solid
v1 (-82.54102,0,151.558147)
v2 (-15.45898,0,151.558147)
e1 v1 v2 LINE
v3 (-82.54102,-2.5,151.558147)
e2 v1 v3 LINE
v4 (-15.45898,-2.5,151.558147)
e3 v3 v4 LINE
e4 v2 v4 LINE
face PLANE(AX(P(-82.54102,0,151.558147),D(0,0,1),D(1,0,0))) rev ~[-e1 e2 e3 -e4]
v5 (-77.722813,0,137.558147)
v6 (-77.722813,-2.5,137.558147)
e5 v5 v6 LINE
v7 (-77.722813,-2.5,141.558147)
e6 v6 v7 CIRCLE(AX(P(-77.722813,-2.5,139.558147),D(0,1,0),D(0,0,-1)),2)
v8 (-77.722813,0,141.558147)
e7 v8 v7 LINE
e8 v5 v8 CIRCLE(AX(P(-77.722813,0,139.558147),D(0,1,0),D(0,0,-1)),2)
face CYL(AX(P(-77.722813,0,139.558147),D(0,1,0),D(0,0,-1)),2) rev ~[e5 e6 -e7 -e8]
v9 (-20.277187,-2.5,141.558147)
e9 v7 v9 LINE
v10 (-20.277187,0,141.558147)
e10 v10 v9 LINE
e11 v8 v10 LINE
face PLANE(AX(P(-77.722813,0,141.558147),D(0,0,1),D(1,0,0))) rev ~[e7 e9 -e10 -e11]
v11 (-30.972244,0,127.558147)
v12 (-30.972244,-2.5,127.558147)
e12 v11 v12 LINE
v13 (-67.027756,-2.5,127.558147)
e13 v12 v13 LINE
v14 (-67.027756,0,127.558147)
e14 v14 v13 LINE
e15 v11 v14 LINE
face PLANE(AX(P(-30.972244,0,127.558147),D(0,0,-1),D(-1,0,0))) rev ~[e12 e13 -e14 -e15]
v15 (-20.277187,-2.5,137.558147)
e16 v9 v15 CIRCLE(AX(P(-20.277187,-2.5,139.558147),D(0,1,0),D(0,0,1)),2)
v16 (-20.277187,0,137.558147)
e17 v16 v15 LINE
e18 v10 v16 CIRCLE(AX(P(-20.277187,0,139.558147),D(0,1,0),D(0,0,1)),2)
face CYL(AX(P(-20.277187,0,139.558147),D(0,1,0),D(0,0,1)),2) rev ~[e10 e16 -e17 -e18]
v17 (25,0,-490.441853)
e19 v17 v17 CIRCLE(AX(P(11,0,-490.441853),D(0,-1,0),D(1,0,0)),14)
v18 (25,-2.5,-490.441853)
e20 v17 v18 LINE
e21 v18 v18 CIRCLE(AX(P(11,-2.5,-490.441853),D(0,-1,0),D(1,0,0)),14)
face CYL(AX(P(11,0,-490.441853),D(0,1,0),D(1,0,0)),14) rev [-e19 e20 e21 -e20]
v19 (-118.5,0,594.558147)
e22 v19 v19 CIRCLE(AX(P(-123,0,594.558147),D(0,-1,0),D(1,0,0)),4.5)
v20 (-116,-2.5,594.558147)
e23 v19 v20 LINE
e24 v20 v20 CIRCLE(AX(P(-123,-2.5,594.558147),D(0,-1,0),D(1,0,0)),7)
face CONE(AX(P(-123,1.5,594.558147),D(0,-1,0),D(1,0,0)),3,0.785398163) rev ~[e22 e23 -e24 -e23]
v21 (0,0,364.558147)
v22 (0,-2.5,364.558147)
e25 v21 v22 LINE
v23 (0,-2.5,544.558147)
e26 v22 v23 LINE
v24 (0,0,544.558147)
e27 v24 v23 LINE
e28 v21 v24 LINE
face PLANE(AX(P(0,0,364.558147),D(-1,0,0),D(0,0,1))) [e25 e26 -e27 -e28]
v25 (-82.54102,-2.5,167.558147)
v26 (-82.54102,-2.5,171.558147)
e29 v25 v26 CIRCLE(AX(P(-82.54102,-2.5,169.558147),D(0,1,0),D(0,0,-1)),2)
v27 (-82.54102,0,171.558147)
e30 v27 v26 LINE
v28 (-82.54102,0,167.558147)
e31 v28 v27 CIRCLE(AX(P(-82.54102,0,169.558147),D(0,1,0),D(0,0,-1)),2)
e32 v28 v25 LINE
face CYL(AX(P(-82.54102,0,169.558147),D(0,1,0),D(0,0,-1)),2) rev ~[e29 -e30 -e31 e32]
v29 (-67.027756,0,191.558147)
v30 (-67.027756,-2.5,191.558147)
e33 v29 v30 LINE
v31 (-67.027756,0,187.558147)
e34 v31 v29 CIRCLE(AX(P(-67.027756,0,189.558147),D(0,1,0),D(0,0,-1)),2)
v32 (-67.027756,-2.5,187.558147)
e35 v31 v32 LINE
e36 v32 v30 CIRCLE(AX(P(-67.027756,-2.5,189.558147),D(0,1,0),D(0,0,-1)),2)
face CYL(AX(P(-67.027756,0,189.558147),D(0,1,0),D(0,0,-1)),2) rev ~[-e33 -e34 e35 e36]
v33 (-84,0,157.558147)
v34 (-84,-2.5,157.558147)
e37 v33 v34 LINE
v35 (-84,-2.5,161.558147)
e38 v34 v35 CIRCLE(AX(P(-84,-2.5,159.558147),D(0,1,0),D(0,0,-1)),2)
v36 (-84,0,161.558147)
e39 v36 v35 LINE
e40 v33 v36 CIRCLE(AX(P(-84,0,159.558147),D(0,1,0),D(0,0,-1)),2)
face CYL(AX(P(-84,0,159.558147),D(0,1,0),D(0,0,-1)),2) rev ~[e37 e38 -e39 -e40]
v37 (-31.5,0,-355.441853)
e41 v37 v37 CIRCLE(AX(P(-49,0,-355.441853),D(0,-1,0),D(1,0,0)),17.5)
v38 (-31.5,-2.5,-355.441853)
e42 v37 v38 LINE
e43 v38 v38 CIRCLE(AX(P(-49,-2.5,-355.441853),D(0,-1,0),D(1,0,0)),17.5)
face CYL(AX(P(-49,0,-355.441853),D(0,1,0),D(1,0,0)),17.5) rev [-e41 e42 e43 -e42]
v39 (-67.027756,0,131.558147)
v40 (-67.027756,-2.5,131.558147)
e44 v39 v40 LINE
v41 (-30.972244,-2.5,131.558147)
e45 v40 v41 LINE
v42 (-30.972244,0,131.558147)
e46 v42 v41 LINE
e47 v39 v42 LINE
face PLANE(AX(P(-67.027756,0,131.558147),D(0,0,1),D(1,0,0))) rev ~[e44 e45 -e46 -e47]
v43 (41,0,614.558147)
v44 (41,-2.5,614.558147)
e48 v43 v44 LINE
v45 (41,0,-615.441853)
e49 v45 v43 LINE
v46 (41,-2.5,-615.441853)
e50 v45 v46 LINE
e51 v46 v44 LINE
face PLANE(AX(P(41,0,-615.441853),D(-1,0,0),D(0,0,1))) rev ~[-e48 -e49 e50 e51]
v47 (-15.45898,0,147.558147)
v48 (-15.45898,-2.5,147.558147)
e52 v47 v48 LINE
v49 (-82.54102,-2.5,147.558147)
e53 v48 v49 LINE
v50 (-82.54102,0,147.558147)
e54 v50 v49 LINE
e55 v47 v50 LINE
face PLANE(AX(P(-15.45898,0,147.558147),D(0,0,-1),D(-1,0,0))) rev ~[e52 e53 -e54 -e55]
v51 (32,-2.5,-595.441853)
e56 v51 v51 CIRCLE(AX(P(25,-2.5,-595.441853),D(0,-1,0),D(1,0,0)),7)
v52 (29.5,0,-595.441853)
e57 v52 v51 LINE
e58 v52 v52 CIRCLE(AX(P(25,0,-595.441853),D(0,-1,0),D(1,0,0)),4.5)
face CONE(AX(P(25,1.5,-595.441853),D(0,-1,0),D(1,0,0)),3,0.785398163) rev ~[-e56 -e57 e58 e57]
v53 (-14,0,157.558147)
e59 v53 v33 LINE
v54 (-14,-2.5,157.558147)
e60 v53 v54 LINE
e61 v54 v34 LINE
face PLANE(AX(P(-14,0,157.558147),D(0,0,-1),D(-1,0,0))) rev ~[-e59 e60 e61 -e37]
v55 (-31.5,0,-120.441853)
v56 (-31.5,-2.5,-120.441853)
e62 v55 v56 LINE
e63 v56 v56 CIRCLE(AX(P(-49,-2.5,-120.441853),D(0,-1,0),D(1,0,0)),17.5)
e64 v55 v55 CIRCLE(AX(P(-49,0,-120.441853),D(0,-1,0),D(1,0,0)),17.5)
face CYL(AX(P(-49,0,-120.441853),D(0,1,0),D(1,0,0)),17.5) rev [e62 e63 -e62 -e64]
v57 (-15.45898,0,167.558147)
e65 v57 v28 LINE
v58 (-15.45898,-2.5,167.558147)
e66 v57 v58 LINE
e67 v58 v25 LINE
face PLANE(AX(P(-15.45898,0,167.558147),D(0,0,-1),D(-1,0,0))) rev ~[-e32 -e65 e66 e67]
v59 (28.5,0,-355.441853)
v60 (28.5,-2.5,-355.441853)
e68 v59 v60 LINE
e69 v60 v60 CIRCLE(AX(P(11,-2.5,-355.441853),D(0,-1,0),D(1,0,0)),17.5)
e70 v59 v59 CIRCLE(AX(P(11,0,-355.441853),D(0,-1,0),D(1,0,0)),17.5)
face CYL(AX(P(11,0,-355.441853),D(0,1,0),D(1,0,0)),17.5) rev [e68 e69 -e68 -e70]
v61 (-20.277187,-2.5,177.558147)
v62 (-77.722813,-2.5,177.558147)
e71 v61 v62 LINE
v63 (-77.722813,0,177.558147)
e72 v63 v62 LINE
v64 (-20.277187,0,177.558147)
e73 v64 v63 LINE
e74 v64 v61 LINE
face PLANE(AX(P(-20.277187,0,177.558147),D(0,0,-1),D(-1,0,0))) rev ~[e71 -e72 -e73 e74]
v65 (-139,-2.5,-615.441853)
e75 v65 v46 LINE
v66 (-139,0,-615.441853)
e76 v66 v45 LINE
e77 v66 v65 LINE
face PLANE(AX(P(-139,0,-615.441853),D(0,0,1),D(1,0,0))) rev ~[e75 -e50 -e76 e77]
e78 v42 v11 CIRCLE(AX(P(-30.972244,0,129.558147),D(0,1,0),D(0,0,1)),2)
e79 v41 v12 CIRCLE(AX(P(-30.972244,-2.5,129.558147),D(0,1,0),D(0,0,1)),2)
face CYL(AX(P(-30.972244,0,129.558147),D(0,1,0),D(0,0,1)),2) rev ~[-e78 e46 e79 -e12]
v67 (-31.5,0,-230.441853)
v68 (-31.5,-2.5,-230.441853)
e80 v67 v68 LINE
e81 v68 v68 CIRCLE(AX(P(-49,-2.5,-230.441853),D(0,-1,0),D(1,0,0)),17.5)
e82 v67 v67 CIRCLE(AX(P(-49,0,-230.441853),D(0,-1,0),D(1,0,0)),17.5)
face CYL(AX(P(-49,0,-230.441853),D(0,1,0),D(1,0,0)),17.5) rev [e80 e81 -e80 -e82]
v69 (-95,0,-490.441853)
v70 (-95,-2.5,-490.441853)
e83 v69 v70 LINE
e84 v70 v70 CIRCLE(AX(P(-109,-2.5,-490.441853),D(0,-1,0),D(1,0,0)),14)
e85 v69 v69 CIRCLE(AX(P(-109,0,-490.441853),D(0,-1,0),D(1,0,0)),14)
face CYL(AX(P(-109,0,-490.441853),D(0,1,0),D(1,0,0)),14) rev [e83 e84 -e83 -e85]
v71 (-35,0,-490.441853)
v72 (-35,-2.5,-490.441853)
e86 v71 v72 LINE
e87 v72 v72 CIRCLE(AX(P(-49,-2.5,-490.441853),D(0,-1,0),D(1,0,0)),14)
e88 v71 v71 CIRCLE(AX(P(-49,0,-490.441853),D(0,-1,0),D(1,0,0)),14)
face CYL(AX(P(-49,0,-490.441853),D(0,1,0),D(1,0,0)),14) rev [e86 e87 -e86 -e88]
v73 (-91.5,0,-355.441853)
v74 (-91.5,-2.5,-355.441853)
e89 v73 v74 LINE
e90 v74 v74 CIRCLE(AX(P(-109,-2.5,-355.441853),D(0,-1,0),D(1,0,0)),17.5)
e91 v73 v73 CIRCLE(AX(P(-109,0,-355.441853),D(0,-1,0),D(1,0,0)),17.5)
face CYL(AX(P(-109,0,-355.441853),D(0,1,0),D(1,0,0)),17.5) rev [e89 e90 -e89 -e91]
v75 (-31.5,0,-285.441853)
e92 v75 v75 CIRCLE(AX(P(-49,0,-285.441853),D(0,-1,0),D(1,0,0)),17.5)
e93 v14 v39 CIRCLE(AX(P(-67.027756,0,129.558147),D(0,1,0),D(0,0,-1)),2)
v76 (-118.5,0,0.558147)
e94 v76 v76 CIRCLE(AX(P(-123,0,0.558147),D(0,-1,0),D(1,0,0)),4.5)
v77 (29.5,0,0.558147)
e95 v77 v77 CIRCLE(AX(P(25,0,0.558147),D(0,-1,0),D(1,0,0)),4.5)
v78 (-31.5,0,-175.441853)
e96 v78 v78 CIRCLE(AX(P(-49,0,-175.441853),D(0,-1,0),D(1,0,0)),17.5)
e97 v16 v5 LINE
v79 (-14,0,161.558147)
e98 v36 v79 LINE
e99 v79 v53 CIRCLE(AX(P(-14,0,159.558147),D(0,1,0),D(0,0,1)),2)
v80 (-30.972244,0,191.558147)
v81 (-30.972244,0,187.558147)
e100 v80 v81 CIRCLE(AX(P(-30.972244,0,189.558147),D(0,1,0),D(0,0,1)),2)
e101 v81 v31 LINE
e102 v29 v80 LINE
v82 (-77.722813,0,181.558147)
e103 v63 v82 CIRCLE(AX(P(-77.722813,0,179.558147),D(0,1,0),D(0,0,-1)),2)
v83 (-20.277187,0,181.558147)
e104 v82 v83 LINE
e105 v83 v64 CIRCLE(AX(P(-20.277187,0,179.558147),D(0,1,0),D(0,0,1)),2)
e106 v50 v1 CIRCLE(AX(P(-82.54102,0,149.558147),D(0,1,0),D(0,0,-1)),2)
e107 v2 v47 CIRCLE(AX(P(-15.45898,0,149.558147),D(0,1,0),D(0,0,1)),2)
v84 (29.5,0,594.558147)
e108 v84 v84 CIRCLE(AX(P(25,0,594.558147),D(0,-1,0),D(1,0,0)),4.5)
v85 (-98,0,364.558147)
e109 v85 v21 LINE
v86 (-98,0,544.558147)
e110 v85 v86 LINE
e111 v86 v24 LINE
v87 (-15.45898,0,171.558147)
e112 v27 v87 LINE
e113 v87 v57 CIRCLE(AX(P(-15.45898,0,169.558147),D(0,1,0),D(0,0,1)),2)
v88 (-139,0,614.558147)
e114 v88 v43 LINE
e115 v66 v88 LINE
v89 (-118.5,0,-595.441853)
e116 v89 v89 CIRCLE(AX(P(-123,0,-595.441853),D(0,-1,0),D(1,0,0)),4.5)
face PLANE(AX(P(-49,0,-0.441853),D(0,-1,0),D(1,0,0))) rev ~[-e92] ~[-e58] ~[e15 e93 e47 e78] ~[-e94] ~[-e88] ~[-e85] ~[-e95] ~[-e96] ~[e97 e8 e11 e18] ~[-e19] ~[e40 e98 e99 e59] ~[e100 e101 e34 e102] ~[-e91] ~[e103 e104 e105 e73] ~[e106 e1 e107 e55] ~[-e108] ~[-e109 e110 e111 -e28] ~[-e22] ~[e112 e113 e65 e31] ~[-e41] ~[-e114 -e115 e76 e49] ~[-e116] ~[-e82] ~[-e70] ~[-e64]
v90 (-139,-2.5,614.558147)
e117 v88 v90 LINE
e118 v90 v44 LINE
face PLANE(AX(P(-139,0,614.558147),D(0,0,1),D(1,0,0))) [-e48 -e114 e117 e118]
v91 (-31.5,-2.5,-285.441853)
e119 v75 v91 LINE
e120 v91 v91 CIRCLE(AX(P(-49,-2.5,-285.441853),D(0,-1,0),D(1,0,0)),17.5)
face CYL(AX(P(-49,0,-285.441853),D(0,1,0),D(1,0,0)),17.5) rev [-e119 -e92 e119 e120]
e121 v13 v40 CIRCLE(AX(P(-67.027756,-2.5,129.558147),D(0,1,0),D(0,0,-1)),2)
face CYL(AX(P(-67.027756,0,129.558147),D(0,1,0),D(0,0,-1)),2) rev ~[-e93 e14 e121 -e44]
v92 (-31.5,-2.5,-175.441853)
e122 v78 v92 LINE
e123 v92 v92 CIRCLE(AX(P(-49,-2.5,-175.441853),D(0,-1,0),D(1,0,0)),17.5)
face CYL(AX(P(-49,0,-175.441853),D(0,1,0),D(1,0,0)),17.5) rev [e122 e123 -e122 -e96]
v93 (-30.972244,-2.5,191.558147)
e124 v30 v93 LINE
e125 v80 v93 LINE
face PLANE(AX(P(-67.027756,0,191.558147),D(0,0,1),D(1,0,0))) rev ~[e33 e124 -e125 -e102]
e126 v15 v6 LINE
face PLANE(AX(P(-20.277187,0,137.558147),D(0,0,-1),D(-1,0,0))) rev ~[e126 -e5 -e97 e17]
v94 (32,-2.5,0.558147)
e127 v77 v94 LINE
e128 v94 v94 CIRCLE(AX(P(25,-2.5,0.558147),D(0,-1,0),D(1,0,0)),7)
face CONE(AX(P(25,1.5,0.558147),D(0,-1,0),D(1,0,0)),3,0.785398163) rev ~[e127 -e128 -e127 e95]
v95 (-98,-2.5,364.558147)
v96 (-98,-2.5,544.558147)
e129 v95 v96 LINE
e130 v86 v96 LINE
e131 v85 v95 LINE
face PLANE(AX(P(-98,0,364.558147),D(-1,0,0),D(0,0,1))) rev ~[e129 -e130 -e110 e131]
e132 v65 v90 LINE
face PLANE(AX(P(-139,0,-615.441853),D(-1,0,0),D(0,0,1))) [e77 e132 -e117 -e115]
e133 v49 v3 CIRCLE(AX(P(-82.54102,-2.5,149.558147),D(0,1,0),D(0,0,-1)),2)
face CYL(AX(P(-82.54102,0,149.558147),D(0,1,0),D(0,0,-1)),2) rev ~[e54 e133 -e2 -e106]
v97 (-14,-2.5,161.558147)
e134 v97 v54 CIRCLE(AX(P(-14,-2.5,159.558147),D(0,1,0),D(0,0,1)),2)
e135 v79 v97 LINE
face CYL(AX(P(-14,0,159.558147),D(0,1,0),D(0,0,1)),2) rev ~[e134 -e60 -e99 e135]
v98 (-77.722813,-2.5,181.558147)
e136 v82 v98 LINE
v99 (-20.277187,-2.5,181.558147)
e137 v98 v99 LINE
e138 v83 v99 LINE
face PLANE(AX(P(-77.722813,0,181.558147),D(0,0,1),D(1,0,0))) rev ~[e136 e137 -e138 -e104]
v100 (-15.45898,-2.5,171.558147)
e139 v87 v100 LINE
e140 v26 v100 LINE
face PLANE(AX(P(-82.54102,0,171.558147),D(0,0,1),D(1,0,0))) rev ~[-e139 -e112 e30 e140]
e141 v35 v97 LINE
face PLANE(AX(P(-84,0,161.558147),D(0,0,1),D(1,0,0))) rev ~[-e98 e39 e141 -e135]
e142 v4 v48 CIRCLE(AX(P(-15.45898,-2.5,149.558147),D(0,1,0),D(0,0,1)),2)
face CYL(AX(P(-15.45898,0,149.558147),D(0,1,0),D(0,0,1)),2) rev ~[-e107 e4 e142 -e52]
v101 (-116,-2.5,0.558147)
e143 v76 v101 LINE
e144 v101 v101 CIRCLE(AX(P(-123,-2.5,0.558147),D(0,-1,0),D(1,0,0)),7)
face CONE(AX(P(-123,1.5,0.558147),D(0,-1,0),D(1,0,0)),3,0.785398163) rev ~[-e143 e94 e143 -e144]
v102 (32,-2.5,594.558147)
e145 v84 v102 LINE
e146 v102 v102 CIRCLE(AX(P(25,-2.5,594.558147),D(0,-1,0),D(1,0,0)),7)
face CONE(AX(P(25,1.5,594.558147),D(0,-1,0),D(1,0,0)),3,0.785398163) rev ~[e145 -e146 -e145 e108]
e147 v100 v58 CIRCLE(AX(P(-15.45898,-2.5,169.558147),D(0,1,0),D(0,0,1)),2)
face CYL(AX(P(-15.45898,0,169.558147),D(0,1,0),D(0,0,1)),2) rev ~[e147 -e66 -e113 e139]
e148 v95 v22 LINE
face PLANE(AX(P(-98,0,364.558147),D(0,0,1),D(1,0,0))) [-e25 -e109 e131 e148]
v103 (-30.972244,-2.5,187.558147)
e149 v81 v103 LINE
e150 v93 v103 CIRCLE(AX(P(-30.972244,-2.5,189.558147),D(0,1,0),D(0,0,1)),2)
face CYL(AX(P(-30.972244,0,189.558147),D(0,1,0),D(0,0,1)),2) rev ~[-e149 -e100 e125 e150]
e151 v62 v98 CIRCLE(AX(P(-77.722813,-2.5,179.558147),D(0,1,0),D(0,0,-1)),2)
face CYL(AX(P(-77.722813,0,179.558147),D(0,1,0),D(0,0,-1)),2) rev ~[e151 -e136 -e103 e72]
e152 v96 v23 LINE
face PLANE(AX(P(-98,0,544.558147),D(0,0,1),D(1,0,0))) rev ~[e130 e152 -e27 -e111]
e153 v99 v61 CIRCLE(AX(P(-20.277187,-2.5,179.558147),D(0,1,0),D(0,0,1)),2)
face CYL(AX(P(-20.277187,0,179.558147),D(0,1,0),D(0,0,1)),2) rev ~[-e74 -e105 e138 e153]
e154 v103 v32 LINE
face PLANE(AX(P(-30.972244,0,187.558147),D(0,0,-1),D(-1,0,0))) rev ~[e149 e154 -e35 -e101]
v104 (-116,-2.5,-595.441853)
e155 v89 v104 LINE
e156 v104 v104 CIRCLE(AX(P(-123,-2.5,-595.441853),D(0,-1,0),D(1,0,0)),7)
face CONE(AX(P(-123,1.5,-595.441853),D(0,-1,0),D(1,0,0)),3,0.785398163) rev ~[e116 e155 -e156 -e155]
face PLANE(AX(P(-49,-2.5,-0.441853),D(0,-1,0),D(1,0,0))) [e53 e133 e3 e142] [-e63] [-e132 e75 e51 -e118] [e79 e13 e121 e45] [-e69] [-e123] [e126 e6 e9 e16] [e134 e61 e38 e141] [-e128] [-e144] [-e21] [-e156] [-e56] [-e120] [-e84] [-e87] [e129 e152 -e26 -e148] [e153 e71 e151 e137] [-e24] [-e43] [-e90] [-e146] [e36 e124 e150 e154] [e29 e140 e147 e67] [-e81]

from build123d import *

# Parameters (mm, degrees)
F0_W     = 180
F0_H     = 1230
F0_R     = 3
F0_R_2   = 14
F0_R_3   = 17.5
F0_W_2   = 98
F0_H_2   = 180
F1_DEPTH = 2.5


# Not quite as in the source:
# - a fillet or chamfer that OpenCascade refuses, or shapes differently, is made with other operations: its cross-section is extruded or revolved along the edge and cut away or added
# - the program builds the solid bodies; features that only make, move or delete a surface that nothing else refers to are left out


with BuildPart() as f1:
    # F0 (on Front) → F1 (new body)
    with BuildSketch(Plane.XZ):
        with Locations((-49, -0.441852957)):
            Rectangle(F0_W, F0_H)
        with Locations((-123, -595.441852957)):
            Circle(F0_R, mode=Mode.SUBTRACT)
        with Locations((-109, -490.441852957)):
            Circle(F0_R_2, mode=Mode.SUBTRACT)
        with Locations((-109, -355.441852957)):
            Circle(F0_R_3, mode=Mode.SUBTRACT)
        with Locations((-49, -490.441852957)):
            Circle(F0_R_2, mode=Mode.SUBTRACT)
        with Locations((-49, -355.441852957)):
            Circle(F0_R_3, mode=Mode.SUBTRACT)
        with Locations((11, -490.441852957)):
            Circle(F0_R_2, mode=Mode.SUBTRACT)
        with Locations((25, -595.441852957)):
            Circle(F0_R, mode=Mode.SUBTRACT)
        with Locations((11, -355.441852957)):
            Circle(F0_R_3, mode=Mode.SUBTRACT)
        with Locations((-49, -285.441852957)):
            Circle(F0_R_3, mode=Mode.SUBTRACT)
        with Locations((-49, -230.441852957)):
            Circle(F0_R_3, mode=Mode.SUBTRACT)
        with Locations((-49, -175.441852957)):
            Circle(F0_R_3, mode=Mode.SUBTRACT)
        with Locations((-49, -120.441852957)):
            Circle(F0_R_3, mode=Mode.SUBTRACT)
        with Locations((-123, 0.558147043)):
            Circle(F0_R, mode=Mode.SUBTRACT)
        with BuildLine():
            Line((-30.9722436227, 127.558147043), (-67.0277563773, 127.558147043))
            ThreePointArc((-67.0277563773, 127.558147043), (-69.0277563773, 129.558147043), (-67.0277563773, 131.558147043))
            Line((-67.0277563773, 131.558147043), (-30.9722436227, 131.558147043))
            ThreePointArc((-30.9722436227, 131.558147043), (-28.9722436227, 129.558147043), (-30.9722436227, 127.558147043))
        make_face(mode=Mode.SUBTRACT)
        with BuildLine():
            Line((-20.2771867673, 137.558147043), (-77.7228132327, 137.558147043))
            ThreePointArc((-77.7228132327, 137.558147043), (-79.7228132327, 139.558147043), (-77.7228132327, 141.558147043))
            Line((-77.7228132327, 141.558147043), (-20.2771867673, 141.558147043))
            ThreePointArc((-20.2771867673, 141.558147043), (-18.2771867673, 139.558147043), (-20.2771867673, 137.558147043))
        make_face(mode=Mode.SUBTRACT)
        with BuildLine():
            Line((-15.4589803375, 147.558147043), (-82.5410196625, 147.558147043))
            ThreePointArc((-82.5410196625, 147.558147043), (-84.5410196625, 149.558147043), (-82.5410196625, 151.558147043))
            Line((-82.5410196625, 151.558147043), (-15.4589803375, 151.558147043))
            ThreePointArc((-15.4589803375, 151.558147043), (-13.4589803375, 149.558147043), (-15.4589803375, 147.558147043))
        make_face(mode=Mode.SUBTRACT)
        with BuildLine():
            Line((-15.4589803375, 167.558147043), (-82.5410196625, 167.558147043))
            ThreePointArc((-82.5410196625, 167.558147043), (-84.5410196625, 169.558147043), (-82.5410196625, 171.558147043))
            Line((-82.5410196625, 171.558147043), (-15.4589803375, 171.558147043))
            ThreePointArc((-15.4589803375, 171.558147043), (-13.4589803375, 169.558147043), (-15.4589803375, 167.558147043))
        make_face(mode=Mode.SUBTRACT)
        with BuildLine():
            Line((-20.2771867673, 177.558147043), (-77.7228132327, 177.558147043))
            ThreePointArc((-77.7228132327, 177.558147043), (-79.7228132327, 179.558147043), (-77.7228132327, 181.558147043))
            Line((-77.7228132327, 181.558147043), (-20.2771867673, 181.558147043))
            ThreePointArc((-20.2771867673, 181.558147043), (-18.2771867673, 179.558147043), (-20.2771867673, 177.558147043))
        make_face(mode=Mode.SUBTRACT)
        with BuildLine():
            Line((-30.9722436227, 187.558147043), (-67.0277563773, 187.558147043))
            ThreePointArc((-67.0277563773, 187.558147043), (-69.0277563773, 189.558147043), (-67.0277563773, 191.558147043))
            Line((-67.0277563773, 191.558147043), (-30.9722436227, 191.558147043))
            ThreePointArc((-30.9722436227, 191.558147043), (-28.9722436227, 189.558147043), (-30.9722436227, 187.558147043))
        make_face(mode=Mode.SUBTRACT)
        with Locations((-123, 594.558147043)):
            Circle(F0_R, mode=Mode.SUBTRACT)
        with BuildLine():
            Line((-14, 157.558147043), (-84, 157.558147043))
            ThreePointArc((-84, 157.558147043), (-86, 159.558147043), (-84, 161.558147043))
            Line((-84, 161.558147043), (-14, 161.558147043))
            ThreePointArc((-14, 161.558147043), (-12, 159.558147043), (-14, 157.558147043))
        make_face(mode=Mode.SUBTRACT)
        with Locations((25, 0.558147043)):
            Circle(F0_R, mode=Mode.SUBTRACT)
        with Locations((-49, 454.558147043)):
            Rectangle(F0_W_2, F0_H_2, mode=Mode.SUBTRACT)
        with Locations((25, 594.558147043)):
            Circle(F0_R, mode=Mode.SUBTRACT)
    extrude(amount=F1_DEPTH)

    # F2: chamfer of 4 on 6 edges, made by hand

    # F2_s1 → F2_t2 (revolve, cut)
    with BuildSketch(Plane.XY.offset(-595.441852957)):
        Polygon((28, 1.5), (32, -2.5), (28, -2.5), align=None)
    revolve(axis=Axis((25, -2.5, -595.441852957), (0, -1, 0)), mode=Mode.SUBTRACT)

    # F2_s3 → F2_t4 (revolve, cut)
    with BuildSketch(Plane.XY.offset(-595.441852957)):
        Polygon((-120, 1.5), (-116, -2.5), (-120, -2.5), align=None)
    revolve(axis=Axis((-123, -2.5, -595.441852957), (0, -1, 0)), mode=Mode.SUBTRACT)

    # F2_s5 → F2_t6 (revolve, cut)
    with BuildSketch(Plane.XY.offset(0.558147043)):
        Polygon((-120, 1.5), (-116, -2.5), (-120, -2.5), align=None)
    revolve(axis=Axis((-123, -2.5, 0.558147043), (0, -1, 0)), mode=Mode.SUBTRACT)

    # F2_s7 → F2_t8 (revolve, cut)
    with BuildSketch(Plane.XY.offset(0.558147043)):
        Polygon((28, 1.5), (32, -2.5), (28, -2.5), align=None)
    revolve(axis=Axis((25, -2.5, 0.558147043), (0, -1, 0)), mode=Mode.SUBTRACT)

    # F2_s9 → F2_t10 (revolve, cut)
    with BuildSketch(Plane.XY.offset(594.558147043)):
        Polygon((28, 1.5), (32, -2.5), (28, -2.5), align=None)
    revolve(axis=Axis((25, -2.5, 594.558147043), (0, -1, 0)), mode=Mode.SUBTRACT)

    # F2_s11 → F2_t12 (revolve, cut)
    with BuildSketch(Plane.XY.offset(594.558147043)):
        Polygon((-120, 1.5), (-116, -2.5), (-120, -2.5), align=None)
    revolve(axis=Axis((-123, -2.5, 594.558147043), (0, -1, 0)), mode=Mode.SUBTRACT)


solid = f1.part
